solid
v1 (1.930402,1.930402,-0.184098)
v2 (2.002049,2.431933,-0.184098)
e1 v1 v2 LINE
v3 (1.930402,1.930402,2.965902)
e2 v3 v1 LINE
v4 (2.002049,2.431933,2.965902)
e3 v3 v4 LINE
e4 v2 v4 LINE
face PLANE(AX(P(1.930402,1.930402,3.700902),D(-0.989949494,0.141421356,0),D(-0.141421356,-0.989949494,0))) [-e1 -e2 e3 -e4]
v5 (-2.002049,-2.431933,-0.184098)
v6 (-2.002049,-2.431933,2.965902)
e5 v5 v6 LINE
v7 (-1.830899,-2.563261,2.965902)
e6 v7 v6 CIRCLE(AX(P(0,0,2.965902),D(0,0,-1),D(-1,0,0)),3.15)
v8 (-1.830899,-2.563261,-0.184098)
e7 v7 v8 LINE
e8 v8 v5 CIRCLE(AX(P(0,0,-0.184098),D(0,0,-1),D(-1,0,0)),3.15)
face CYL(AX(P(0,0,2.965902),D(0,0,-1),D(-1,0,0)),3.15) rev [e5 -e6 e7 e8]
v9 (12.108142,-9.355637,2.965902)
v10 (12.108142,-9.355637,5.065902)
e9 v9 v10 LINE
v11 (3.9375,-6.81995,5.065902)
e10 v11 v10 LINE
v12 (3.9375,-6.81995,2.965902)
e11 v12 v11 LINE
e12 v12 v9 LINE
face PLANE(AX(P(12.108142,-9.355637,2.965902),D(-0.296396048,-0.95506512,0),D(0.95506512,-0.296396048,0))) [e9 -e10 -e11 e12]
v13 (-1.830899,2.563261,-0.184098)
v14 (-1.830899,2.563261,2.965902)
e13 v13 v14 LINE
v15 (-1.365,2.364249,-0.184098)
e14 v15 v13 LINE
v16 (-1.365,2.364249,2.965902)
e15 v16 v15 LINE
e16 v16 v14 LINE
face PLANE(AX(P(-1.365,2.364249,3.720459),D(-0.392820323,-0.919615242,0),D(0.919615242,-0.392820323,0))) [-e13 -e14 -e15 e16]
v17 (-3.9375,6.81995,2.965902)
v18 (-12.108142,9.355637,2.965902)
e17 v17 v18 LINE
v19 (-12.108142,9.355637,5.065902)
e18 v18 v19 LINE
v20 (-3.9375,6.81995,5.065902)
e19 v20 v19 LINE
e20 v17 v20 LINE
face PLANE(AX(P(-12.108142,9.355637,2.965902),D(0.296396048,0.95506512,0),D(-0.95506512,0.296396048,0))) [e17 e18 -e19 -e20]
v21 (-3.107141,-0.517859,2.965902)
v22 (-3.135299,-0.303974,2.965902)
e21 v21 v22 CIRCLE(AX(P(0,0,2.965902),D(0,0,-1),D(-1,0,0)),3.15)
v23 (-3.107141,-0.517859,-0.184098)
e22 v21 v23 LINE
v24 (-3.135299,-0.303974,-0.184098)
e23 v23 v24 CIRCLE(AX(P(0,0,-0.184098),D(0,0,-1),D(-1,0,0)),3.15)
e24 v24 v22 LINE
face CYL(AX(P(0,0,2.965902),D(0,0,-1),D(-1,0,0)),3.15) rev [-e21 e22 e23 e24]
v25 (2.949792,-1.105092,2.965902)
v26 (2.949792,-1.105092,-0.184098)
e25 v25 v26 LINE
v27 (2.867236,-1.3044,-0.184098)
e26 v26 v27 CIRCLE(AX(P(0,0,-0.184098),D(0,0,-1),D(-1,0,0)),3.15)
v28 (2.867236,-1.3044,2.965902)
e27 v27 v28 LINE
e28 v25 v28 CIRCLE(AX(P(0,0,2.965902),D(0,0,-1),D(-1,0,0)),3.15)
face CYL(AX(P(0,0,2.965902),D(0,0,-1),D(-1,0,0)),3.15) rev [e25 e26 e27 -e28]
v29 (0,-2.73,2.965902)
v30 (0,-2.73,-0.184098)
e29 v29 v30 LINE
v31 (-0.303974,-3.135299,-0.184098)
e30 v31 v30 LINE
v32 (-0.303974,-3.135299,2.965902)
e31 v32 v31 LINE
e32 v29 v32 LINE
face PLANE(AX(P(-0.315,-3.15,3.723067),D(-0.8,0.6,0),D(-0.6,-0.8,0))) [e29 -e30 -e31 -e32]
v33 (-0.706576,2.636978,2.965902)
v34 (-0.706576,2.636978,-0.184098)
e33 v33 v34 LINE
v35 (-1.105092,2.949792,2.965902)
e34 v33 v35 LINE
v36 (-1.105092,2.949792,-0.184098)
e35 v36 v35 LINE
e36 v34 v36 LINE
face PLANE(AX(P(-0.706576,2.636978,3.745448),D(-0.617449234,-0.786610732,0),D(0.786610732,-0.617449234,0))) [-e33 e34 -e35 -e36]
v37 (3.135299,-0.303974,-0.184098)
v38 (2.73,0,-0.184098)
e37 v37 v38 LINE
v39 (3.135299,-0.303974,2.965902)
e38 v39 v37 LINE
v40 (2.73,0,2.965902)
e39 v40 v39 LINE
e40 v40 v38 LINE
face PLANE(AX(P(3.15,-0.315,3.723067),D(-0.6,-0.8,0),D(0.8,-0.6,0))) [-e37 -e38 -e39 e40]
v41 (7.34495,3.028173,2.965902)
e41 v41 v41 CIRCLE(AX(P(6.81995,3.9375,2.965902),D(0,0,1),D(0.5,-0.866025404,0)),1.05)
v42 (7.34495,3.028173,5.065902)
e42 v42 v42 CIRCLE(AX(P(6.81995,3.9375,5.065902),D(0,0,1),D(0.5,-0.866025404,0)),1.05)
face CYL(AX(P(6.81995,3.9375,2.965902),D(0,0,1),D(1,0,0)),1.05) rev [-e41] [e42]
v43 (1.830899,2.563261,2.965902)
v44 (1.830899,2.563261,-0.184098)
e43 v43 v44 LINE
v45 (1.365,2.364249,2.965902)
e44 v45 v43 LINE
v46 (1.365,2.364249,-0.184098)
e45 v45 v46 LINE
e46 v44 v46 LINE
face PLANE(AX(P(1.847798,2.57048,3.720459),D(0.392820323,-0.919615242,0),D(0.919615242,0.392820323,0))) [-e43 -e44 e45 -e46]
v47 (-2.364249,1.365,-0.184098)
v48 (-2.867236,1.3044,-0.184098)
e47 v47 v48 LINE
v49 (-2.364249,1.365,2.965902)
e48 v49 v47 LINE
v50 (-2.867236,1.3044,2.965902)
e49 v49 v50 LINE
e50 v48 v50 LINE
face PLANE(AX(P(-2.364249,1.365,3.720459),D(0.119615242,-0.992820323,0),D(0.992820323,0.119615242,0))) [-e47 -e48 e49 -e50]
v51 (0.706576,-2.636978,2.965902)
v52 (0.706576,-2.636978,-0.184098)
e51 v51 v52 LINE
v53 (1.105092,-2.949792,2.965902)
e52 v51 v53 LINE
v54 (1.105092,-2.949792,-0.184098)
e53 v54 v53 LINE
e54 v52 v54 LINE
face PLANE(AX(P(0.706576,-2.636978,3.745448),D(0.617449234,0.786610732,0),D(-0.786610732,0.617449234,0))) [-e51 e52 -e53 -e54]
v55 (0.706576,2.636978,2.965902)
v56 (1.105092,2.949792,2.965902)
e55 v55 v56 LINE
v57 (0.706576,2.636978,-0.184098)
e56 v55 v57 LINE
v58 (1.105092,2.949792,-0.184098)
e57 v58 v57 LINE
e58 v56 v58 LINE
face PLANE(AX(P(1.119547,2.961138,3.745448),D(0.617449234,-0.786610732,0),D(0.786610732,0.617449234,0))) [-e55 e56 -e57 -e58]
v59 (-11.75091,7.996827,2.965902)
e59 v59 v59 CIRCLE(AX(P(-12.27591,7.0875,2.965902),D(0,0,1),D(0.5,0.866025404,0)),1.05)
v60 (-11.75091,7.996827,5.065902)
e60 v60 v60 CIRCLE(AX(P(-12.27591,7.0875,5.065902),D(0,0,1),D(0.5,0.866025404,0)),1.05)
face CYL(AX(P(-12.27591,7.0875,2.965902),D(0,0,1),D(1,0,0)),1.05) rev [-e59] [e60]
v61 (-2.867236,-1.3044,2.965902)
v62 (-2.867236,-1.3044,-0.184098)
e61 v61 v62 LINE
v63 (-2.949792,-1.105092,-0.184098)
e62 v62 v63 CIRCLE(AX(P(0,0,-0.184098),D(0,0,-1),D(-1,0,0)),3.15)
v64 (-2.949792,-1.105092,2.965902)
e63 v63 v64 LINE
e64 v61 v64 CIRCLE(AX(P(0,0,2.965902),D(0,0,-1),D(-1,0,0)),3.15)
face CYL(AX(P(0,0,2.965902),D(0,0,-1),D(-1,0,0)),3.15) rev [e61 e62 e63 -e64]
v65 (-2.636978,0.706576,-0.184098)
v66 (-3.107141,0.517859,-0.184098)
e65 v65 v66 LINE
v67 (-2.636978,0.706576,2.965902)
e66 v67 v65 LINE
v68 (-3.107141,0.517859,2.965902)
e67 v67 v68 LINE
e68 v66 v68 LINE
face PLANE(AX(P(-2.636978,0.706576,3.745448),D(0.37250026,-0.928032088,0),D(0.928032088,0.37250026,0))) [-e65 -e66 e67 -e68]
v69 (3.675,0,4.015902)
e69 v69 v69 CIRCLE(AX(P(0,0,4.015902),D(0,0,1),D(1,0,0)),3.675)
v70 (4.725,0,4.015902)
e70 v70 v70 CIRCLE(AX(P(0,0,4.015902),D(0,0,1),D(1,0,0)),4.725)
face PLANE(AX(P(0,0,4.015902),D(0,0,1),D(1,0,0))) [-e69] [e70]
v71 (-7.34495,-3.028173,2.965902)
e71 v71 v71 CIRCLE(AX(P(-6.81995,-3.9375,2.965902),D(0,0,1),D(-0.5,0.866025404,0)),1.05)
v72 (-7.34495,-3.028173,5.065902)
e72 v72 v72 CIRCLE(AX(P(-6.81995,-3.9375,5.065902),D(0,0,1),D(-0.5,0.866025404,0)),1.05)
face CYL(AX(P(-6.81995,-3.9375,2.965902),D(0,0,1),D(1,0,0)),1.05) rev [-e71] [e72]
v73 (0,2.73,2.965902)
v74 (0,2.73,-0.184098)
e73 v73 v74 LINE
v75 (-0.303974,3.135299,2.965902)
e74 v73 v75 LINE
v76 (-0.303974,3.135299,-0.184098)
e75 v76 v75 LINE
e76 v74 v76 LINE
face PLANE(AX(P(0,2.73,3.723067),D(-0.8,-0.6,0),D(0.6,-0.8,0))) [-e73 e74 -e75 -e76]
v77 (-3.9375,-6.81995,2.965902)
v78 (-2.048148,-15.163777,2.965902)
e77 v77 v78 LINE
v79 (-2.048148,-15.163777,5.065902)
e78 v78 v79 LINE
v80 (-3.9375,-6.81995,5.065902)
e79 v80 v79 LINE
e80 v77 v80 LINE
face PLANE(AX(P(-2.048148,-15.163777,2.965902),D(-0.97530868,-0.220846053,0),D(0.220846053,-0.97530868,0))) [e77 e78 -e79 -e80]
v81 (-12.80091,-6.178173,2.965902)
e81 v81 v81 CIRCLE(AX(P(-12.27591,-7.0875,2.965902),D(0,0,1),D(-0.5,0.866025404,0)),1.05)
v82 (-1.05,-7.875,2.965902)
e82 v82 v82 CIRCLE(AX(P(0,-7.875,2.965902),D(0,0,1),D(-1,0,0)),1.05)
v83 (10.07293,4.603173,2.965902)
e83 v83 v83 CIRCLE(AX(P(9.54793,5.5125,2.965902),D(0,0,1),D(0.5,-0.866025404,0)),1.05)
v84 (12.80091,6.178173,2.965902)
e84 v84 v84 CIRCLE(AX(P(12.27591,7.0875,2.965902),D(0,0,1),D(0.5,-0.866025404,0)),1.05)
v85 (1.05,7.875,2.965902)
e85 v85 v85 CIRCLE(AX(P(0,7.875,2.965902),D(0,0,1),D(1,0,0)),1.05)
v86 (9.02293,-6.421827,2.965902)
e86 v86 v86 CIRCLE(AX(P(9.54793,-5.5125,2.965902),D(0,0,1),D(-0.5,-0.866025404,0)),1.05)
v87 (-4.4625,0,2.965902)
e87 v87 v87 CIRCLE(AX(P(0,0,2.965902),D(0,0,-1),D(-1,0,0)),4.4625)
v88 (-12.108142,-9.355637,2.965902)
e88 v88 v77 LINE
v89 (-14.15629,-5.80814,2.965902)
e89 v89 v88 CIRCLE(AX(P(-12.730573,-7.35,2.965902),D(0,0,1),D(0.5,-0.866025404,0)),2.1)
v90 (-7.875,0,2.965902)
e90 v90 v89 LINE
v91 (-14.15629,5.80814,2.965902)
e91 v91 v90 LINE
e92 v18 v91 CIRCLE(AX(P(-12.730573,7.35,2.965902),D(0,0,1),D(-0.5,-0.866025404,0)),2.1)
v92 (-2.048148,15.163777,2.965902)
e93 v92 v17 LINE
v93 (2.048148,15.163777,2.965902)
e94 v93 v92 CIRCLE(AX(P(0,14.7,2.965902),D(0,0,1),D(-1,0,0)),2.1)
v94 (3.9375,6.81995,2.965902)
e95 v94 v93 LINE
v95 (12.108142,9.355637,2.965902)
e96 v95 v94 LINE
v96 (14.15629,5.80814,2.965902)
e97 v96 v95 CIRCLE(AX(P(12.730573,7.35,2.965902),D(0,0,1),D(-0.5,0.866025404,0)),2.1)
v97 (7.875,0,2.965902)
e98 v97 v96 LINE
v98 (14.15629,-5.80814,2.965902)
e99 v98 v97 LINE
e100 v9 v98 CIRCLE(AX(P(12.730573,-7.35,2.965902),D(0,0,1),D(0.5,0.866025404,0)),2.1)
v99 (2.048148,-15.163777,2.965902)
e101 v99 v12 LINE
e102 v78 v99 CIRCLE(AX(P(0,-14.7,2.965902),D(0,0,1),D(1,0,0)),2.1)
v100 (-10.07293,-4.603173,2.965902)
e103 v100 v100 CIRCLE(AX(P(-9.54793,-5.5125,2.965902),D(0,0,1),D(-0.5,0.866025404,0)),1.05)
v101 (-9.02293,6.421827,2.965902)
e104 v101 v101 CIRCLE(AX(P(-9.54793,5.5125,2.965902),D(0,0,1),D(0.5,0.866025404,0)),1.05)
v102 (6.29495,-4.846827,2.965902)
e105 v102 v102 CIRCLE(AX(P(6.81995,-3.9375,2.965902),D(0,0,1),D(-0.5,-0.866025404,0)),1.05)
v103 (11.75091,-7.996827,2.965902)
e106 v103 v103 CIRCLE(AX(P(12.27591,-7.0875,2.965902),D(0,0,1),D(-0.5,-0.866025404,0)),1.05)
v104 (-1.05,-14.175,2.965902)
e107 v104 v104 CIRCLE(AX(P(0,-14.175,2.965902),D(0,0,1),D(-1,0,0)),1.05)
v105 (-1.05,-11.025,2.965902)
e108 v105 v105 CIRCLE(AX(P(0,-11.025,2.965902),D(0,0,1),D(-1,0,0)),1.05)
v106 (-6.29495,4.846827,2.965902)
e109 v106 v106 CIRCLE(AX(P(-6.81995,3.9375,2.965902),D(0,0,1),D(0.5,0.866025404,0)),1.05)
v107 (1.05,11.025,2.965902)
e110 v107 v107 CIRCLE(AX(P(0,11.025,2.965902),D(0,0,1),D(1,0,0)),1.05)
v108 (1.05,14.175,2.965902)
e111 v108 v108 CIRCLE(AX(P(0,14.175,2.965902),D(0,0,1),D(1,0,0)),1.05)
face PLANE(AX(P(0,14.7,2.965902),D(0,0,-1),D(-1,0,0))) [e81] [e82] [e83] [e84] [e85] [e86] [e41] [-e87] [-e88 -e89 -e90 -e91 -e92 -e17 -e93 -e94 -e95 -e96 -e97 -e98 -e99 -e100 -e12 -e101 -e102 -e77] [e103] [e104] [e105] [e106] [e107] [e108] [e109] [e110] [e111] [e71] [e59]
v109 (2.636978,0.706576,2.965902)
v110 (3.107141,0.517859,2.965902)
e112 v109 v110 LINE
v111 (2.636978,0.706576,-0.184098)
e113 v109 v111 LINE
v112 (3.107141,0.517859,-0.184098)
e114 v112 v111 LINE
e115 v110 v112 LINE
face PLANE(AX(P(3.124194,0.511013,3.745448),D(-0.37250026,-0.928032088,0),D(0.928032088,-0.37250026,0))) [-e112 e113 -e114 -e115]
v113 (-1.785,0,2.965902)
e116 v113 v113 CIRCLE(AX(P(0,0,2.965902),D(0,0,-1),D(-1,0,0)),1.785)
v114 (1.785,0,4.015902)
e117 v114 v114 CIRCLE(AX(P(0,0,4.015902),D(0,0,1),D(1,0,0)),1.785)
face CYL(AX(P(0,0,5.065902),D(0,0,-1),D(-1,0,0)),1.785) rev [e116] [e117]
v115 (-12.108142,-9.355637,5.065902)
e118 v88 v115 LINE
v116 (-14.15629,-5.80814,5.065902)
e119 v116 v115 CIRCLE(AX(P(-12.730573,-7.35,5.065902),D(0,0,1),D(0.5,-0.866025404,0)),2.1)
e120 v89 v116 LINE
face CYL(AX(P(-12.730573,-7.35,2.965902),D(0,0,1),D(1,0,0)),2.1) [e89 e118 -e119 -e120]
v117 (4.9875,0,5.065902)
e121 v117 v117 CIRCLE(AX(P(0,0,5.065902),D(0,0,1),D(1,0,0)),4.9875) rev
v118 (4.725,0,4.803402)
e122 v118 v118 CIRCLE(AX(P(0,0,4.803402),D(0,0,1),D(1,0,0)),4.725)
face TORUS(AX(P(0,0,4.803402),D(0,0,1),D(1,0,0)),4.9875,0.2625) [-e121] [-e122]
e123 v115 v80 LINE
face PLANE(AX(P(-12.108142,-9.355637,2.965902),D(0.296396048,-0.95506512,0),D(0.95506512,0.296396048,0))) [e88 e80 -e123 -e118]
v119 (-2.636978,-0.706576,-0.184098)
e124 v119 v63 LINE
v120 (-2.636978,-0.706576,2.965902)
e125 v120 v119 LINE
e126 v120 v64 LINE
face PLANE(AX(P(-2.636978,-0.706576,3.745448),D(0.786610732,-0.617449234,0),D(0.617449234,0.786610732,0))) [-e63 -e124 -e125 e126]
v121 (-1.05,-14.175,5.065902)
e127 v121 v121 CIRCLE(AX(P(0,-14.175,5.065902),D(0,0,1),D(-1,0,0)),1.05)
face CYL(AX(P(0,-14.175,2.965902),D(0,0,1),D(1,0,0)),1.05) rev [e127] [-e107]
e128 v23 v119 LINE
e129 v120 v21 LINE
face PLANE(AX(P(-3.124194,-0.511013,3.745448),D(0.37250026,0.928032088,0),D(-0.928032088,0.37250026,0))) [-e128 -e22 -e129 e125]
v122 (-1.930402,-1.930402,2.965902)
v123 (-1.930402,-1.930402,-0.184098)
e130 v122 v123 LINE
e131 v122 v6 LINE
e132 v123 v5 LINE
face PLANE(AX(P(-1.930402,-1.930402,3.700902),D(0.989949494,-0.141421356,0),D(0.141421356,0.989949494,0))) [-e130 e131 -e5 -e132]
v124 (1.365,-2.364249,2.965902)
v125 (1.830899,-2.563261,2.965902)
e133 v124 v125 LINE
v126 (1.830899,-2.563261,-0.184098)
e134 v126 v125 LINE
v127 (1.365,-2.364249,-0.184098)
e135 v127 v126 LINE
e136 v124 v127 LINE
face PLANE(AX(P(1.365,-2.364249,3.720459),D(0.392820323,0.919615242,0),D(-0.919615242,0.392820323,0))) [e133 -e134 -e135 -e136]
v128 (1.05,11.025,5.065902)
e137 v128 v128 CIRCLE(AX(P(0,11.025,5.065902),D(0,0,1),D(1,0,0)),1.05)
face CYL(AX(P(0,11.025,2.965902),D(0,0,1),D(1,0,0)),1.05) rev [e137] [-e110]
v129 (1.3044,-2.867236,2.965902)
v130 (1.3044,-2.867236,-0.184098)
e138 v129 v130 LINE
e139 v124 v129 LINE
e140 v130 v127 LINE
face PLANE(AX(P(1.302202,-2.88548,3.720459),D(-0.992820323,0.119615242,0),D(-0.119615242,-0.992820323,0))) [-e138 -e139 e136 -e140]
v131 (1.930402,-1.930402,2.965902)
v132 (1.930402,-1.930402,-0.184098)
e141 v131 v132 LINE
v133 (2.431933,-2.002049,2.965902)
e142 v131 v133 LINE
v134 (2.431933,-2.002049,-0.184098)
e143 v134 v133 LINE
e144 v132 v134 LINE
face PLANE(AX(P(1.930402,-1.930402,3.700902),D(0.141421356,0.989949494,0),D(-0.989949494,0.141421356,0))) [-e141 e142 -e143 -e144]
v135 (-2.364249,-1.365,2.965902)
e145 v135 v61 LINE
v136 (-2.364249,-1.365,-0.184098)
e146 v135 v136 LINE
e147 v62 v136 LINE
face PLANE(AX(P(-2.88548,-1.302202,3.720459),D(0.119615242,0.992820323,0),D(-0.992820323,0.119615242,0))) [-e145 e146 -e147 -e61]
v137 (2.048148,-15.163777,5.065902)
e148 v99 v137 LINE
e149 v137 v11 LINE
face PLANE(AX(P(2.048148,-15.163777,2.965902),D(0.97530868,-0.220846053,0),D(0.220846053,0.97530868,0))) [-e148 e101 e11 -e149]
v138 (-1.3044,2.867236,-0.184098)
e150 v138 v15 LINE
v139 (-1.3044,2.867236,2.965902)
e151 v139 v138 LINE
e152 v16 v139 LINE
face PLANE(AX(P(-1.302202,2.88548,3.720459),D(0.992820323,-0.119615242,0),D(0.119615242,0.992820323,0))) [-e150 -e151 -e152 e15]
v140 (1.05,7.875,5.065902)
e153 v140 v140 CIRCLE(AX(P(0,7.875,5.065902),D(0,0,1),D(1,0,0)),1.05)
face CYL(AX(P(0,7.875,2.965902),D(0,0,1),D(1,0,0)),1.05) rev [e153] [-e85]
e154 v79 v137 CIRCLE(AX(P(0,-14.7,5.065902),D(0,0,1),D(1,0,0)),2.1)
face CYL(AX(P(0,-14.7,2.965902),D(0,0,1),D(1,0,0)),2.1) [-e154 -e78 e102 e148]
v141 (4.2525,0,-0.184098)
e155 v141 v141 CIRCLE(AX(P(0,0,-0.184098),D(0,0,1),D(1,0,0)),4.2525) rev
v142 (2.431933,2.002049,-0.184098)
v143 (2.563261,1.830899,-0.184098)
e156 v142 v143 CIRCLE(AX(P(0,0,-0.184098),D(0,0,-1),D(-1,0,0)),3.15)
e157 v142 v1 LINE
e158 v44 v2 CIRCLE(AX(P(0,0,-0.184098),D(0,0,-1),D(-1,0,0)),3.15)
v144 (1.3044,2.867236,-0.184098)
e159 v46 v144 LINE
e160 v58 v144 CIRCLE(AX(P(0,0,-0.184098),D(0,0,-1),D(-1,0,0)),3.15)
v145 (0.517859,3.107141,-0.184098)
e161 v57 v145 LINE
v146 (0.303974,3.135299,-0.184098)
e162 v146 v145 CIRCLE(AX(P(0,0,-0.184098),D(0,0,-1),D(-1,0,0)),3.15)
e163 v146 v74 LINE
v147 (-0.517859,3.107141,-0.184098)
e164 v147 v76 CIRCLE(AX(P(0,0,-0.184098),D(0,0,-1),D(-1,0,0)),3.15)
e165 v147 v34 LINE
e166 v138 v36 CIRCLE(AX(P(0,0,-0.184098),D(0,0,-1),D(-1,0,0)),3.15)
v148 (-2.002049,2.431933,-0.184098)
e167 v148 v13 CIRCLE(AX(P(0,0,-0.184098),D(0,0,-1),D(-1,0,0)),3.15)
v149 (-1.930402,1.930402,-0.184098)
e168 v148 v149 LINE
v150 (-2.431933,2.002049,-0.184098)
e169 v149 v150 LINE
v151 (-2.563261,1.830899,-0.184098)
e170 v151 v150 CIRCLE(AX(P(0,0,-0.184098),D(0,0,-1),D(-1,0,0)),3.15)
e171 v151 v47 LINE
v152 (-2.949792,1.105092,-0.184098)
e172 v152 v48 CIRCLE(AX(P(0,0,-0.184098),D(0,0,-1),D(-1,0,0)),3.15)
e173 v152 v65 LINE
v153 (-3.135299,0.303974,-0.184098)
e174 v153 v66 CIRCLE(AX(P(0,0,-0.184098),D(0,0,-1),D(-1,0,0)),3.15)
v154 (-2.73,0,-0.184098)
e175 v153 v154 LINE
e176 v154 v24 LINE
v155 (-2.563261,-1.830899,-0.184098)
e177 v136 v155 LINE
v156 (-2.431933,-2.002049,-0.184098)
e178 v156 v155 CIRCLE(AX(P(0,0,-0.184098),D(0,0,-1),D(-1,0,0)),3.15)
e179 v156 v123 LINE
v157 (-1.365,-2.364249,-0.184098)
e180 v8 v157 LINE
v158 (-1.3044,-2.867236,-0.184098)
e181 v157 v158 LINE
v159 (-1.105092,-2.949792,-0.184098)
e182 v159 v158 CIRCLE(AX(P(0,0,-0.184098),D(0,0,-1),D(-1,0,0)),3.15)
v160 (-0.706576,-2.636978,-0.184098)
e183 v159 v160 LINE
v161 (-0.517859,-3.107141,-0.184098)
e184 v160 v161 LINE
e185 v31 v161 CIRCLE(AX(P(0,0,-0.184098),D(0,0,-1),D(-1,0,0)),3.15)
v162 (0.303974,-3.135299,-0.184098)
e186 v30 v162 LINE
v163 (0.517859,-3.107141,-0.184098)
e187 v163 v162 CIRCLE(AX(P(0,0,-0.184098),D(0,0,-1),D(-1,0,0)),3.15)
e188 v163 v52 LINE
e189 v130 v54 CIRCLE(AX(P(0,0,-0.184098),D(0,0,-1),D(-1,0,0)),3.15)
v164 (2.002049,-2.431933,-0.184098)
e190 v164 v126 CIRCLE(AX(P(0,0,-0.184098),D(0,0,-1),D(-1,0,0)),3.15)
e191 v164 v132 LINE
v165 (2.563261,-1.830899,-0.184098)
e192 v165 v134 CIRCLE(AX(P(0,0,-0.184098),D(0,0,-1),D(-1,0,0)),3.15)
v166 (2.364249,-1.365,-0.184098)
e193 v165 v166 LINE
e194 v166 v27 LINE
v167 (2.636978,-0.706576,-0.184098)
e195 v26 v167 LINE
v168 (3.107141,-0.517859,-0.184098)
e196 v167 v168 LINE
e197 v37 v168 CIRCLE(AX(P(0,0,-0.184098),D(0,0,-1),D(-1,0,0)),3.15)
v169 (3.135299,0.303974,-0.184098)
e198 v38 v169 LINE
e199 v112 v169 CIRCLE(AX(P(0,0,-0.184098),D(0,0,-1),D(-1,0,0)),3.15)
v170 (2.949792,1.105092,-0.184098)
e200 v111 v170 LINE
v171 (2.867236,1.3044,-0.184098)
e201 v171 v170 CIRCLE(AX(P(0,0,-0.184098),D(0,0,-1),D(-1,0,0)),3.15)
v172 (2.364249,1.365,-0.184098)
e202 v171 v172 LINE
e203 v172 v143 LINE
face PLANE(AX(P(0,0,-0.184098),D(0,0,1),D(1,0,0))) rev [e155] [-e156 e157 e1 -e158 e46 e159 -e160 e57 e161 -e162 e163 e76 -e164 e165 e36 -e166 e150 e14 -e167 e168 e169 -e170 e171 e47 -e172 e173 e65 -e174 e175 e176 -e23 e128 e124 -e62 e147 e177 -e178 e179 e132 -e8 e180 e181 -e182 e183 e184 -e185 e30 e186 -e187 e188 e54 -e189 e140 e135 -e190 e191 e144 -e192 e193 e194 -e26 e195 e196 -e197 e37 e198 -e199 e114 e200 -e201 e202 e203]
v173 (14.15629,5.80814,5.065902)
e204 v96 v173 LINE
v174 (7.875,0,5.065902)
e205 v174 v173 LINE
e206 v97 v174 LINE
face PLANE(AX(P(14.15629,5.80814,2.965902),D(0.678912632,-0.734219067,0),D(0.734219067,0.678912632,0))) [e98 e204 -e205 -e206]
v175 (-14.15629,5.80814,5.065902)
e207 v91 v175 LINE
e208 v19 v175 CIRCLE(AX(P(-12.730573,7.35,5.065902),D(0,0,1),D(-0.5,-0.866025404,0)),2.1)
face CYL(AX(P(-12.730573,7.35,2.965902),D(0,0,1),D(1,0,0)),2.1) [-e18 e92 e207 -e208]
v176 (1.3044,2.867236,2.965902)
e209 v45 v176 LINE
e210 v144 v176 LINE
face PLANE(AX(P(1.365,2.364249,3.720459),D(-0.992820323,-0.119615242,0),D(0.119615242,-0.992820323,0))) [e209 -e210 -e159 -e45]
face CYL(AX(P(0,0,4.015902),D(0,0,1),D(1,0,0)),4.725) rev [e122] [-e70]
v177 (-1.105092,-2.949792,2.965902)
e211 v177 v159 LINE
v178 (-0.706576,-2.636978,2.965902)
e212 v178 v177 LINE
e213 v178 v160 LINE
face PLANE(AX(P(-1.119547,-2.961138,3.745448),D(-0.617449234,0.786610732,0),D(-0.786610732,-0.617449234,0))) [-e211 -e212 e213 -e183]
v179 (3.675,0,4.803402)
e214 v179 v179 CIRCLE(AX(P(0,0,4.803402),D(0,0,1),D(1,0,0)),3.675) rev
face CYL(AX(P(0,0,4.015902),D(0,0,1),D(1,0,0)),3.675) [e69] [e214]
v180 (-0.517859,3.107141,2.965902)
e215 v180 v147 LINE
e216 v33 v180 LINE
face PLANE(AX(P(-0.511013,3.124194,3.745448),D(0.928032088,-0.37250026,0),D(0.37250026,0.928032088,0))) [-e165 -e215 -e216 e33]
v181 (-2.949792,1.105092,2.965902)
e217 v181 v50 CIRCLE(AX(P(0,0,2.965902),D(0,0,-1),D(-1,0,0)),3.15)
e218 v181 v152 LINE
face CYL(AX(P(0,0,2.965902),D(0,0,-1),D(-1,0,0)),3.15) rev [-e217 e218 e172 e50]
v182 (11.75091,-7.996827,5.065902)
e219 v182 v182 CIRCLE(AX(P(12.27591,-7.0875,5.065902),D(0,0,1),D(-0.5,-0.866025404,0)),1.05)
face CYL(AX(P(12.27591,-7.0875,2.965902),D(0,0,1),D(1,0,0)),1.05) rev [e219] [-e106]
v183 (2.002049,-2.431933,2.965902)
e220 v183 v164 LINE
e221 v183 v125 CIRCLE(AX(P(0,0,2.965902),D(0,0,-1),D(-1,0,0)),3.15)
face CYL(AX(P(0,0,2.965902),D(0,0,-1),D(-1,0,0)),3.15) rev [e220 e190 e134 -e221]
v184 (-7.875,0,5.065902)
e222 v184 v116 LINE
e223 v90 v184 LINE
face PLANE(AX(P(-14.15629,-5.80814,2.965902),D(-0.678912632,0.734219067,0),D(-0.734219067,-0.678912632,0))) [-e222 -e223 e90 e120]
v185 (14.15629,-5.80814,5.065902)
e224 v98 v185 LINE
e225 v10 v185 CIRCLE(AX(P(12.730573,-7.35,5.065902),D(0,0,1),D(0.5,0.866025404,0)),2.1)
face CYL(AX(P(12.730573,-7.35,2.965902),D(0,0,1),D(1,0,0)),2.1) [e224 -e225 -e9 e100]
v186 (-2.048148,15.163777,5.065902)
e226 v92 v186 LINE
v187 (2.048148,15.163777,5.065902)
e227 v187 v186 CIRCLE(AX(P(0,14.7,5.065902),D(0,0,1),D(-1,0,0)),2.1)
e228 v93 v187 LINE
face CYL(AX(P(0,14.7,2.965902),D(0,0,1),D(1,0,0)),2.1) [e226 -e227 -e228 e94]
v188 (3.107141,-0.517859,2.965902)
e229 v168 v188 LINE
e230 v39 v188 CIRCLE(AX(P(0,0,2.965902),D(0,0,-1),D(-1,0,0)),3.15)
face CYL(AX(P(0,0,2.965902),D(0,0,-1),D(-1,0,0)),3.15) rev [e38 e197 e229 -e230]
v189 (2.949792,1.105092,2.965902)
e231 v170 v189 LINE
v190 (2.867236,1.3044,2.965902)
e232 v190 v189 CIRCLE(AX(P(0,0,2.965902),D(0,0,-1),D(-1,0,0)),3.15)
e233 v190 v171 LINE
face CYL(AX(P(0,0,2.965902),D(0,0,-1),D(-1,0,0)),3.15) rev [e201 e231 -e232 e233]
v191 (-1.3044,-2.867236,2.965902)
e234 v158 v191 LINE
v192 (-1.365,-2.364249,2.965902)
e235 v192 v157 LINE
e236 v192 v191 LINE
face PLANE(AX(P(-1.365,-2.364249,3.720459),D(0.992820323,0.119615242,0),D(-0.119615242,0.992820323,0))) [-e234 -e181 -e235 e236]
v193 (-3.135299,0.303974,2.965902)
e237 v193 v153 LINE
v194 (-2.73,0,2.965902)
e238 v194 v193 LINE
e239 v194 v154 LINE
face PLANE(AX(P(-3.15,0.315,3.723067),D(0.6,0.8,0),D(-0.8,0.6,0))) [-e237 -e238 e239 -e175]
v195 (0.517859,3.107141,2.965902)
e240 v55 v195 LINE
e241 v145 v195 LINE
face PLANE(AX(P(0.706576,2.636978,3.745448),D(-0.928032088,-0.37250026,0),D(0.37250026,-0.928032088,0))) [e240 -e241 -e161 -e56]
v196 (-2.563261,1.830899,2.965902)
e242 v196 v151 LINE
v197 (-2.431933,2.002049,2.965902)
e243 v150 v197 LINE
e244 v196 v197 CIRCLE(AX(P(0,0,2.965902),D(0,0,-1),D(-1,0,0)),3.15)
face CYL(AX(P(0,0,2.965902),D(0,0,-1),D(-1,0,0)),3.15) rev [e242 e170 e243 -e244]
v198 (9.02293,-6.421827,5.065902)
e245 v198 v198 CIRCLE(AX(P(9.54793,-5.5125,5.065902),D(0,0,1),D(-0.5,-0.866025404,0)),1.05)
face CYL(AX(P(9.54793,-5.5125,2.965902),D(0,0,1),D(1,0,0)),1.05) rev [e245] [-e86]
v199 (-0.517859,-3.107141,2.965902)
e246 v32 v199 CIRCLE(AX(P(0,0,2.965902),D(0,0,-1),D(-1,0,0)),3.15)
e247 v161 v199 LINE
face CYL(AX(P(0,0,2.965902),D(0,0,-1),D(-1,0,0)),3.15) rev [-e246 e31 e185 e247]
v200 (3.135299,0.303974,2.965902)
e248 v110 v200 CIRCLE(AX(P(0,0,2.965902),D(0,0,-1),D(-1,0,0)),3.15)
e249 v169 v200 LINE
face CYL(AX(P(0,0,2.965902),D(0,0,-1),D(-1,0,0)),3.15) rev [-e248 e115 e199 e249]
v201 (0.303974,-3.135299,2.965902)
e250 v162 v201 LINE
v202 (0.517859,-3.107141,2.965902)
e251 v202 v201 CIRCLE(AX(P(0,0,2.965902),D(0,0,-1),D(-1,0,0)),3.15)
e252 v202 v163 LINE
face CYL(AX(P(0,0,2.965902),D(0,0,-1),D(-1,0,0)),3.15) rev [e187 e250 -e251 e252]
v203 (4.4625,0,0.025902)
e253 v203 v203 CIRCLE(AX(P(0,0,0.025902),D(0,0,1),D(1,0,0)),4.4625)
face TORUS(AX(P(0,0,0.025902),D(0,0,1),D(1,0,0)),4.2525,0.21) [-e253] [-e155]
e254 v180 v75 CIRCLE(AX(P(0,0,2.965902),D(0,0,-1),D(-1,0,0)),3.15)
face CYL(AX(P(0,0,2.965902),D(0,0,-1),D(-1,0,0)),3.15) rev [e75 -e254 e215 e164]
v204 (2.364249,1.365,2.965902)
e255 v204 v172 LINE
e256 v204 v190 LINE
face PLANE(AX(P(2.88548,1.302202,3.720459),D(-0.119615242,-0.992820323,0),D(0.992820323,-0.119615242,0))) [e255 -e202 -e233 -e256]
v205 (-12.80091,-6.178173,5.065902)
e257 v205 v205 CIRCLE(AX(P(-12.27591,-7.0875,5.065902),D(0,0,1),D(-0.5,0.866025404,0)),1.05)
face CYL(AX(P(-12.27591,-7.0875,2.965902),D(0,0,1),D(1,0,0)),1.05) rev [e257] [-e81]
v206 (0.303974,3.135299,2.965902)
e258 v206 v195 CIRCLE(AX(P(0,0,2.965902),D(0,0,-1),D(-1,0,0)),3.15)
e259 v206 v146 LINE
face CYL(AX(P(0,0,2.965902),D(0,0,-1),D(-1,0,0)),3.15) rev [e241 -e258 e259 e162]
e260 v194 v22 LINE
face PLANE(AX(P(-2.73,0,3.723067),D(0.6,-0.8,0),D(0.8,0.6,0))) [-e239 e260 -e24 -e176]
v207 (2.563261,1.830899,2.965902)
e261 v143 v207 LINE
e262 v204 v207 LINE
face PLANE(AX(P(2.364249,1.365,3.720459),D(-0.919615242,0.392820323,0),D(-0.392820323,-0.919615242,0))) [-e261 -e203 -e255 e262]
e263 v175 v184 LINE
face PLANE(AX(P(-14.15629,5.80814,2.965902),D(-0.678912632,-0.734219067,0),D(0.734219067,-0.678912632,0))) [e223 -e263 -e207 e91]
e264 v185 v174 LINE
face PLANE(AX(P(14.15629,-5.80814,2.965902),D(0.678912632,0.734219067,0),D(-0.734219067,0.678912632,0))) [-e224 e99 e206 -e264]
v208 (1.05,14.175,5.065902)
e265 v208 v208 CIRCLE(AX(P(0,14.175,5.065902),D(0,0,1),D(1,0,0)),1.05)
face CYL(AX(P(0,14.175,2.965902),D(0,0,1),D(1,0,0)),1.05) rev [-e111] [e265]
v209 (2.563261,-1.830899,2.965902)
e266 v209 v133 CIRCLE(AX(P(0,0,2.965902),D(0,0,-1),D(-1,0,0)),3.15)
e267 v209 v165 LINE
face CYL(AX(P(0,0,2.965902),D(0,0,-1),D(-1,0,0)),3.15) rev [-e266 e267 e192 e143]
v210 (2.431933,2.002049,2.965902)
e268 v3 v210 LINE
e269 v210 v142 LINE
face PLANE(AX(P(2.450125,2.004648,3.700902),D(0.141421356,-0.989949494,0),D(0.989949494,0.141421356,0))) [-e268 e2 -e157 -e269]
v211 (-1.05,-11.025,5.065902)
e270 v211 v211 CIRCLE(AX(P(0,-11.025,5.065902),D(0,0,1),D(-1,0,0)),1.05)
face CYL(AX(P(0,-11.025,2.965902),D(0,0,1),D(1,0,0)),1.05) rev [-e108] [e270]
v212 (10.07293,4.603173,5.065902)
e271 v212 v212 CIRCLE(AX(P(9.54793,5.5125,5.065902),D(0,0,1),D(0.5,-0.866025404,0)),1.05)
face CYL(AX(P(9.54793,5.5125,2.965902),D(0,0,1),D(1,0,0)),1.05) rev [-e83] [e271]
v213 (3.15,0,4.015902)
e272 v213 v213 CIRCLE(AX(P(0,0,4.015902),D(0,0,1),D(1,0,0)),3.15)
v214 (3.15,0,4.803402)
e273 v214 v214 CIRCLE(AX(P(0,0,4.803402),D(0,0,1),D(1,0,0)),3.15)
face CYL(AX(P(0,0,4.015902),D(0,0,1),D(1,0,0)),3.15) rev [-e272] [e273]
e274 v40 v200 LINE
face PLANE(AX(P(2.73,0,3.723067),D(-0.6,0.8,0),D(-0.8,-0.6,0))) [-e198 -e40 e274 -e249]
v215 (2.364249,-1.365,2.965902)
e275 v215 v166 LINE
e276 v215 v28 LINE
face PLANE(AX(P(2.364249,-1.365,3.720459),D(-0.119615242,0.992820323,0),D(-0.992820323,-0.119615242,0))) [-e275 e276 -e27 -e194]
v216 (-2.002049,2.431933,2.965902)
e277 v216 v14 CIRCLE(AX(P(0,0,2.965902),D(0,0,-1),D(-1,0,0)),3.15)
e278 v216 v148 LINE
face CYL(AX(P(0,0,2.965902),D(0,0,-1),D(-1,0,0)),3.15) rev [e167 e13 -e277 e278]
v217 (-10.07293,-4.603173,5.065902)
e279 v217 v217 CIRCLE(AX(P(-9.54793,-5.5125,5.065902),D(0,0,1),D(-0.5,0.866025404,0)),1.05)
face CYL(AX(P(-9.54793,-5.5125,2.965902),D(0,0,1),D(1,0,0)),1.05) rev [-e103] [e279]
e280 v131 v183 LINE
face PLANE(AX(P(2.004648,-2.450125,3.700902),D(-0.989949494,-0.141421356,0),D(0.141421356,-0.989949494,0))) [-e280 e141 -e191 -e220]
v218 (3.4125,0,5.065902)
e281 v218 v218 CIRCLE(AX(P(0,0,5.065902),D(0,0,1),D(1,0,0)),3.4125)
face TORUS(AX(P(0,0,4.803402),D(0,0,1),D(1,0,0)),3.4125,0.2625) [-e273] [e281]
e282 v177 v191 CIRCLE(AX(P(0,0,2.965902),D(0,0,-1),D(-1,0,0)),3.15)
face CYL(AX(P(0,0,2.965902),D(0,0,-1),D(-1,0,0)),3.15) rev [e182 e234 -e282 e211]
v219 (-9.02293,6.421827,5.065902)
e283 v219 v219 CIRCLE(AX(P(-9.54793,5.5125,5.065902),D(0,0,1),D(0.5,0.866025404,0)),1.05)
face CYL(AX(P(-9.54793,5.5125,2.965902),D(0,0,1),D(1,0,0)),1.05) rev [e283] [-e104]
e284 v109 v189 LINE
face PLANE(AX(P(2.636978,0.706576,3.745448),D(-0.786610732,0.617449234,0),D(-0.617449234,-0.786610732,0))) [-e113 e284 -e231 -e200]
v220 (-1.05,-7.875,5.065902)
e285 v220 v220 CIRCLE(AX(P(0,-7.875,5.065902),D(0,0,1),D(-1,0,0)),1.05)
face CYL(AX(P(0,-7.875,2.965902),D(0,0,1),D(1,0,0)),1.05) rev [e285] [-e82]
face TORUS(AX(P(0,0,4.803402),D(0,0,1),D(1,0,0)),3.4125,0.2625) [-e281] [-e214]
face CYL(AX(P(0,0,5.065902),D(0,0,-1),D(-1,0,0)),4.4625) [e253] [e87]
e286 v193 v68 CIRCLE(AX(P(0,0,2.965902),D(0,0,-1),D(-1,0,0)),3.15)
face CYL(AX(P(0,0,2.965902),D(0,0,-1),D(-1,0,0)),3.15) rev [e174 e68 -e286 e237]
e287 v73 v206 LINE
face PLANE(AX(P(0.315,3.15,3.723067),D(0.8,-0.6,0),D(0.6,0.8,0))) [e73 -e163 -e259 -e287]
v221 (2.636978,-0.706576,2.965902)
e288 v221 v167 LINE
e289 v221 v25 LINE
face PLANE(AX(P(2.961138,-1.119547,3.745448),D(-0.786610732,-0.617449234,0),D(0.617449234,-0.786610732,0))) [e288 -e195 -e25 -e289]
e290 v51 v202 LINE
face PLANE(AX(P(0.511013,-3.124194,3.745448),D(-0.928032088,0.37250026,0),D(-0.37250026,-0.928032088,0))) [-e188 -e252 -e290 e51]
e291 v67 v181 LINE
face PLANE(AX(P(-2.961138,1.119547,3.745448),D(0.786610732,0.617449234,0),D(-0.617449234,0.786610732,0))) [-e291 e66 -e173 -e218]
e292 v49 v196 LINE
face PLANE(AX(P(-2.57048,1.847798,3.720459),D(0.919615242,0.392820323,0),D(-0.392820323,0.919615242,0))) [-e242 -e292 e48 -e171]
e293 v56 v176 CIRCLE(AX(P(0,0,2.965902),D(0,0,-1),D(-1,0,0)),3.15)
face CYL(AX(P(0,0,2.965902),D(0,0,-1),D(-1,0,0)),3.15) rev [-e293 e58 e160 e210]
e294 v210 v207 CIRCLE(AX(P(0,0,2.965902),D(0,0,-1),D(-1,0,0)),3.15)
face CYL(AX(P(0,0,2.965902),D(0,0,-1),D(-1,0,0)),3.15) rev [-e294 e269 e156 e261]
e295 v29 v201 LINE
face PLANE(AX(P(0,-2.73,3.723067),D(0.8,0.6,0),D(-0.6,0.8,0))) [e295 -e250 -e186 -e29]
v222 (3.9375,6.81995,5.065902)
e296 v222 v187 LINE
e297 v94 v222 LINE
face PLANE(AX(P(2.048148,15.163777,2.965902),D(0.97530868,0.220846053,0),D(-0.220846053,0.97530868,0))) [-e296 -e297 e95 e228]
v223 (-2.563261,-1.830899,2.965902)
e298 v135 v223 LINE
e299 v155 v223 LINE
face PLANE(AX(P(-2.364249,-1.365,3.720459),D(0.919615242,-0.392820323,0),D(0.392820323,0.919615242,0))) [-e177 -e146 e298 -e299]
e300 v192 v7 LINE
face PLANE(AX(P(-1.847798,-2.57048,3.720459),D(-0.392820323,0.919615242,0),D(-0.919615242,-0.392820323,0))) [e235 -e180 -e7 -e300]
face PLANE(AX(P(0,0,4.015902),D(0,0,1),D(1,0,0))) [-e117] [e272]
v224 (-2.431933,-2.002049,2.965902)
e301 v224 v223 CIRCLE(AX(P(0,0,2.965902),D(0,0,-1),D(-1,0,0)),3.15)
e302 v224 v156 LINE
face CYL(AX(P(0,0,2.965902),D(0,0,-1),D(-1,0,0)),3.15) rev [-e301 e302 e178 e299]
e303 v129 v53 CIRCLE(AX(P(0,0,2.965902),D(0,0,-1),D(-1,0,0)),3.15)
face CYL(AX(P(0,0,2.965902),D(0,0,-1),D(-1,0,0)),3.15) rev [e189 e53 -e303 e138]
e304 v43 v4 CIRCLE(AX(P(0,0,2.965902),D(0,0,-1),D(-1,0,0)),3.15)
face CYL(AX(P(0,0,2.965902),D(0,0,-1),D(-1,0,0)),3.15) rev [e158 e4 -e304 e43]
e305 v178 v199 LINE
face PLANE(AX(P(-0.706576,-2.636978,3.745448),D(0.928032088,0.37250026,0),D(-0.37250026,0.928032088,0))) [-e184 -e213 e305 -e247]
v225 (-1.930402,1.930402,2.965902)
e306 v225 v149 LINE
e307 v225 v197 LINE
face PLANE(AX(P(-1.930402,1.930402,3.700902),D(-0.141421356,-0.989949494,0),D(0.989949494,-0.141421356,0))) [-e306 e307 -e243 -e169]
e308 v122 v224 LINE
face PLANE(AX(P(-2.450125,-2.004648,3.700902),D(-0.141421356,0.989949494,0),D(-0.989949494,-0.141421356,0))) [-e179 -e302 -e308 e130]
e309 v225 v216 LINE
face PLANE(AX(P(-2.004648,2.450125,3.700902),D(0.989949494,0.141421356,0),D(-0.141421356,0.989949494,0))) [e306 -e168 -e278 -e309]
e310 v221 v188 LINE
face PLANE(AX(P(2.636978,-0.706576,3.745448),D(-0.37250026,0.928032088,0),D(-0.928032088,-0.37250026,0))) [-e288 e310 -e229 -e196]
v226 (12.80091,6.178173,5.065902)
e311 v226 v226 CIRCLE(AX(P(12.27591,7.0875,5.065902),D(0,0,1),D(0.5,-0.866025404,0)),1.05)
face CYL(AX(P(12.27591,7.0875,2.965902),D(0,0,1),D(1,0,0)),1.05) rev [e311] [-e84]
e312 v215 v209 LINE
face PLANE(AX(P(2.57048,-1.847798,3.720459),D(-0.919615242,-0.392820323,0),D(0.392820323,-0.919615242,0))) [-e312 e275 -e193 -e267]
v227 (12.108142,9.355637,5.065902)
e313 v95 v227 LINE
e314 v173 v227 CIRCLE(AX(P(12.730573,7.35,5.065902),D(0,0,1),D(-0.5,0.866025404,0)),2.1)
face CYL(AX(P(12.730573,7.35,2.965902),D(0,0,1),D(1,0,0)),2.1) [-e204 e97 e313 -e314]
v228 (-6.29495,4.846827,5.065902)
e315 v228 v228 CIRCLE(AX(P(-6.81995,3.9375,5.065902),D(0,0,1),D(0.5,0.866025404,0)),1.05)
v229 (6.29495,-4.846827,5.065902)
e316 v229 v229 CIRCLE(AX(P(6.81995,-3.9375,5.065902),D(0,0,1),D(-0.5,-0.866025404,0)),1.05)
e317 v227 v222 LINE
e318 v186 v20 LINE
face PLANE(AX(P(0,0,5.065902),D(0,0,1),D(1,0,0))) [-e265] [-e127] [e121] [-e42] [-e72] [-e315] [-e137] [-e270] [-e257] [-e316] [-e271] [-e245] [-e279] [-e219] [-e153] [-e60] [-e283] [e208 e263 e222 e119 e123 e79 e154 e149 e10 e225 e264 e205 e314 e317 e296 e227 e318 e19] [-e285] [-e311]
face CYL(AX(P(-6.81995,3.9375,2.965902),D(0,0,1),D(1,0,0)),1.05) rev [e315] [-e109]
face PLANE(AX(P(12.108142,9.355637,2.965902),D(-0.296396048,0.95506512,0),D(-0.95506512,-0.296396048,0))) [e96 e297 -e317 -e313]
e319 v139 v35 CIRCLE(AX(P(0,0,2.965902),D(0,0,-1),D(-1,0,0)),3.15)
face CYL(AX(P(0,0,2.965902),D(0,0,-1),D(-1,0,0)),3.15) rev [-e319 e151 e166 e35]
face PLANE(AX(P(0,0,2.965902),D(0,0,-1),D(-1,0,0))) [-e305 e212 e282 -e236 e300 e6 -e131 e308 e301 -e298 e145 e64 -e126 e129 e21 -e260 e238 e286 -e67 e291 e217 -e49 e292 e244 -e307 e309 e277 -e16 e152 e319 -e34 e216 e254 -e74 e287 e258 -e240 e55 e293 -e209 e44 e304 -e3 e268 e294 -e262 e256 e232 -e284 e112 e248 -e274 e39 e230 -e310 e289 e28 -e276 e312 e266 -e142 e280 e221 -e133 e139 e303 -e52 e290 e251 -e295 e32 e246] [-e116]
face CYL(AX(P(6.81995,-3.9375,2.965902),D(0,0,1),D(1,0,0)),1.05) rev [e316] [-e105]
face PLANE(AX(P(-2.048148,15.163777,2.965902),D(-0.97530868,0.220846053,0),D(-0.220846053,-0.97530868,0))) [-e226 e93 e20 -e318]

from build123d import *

# Parameters (mm, degrees)
ESQUISSE1_R                  = 4.25
ESQUISSE1_R_2                = 1.7
BOSS_EXTRU_1_DEPTH           = 5
ESQUISSE2_R                  = 3
ENL_V_MAT_EXTRU_1_DEPTH      = 3
BOSS_EXTRU_2_DEPTH           = 3
R_P_TITION_CIRCULAIRE1_DEPTH = 4
ESQUISSE4_R                  = 1
BOSS_EXTRU_3_DEPTH           = 2
R_P_TITION_CIRCULAIRE2_COUNT = 6
ENL_V_START                  = -1
ESQUISSE5_R                  = 3
ENL_V_MAT_EXTRU_2_DEPTH      = 1
CONG_1_R                     = 0.2
ESQUISSE6_R                  = 4.5
ESQUISSE6_R_2                = 3.5
ENL_V_MAT_EXTRU_3_DEPTH      = 1
CONG_2_R                     = 0.25
SCALE1_SCALE                 = 1.05


with BuildPart() as part:
    # Esquisse1 → Boss.-Extru.1 (new body)
    with BuildSketch(Plane.XY):
        Circle(ESQUISSE1_R)
        Circle(ESQUISSE1_R_2, mode=Mode.SUBTRACT)
    extrude(amount=BOSS_EXTRU_1_DEPTH)

    # Esquisse2 → Enlèv. mat.-Extru.1 (cut)
    with BuildSketch(Plane(origin=(0, 0, 0), x_dir=(-1, 0, 0), z_dir=(0, 0, -1))):
        Circle(ESQUISSE2_R)
    extrude(amount=-ENL_V_MAT_EXTRU_1_DEPTH, mode=Mode.SUBTRACT)

    # Esquisse3 → Boss.-Extru.2 (add)
    with BuildSketch(Plane(origin=(0, 0, 0), x_dir=(-1, 0, 0), z_dir=(0, 0, -1))):
        Polygon((-0.3, 3), (0, 2.6), (0.3, 3), align=None)
    extrude(amount=-BOSS_EXTRU_2_DEPTH)

    # Répétition circulaire1: read off the stored shape, not the designer's step
    # Répétition circulaire1 outline → Répétition circulaire1 (add)
    with BuildSketch(Plane.XY):
        with BuildLine():
            ThreePointArc((1.052468236, 2.80932565), (0.776457135, 2.897777479), (0.493198596, 2.959181499))
            Line((0.493198596, 2.959181499), (0.672929517, 2.511407148))
            Line((0.672929517, 2.511407148), (1.052468236, 2.80932565))
        make_face()
        with BuildLine():
            ThreePointArc((-0.493198596, 2.959181499), (-0.776457135, 2.897777479), (-1.052468236, 2.80932565))
            Line((-1.052468236, 2.80932565), (-0.672929517, 2.511407148))
            Line((-0.672929517, 2.511407148), (-0.493198596, 2.959181499))
        make_face()
        with BuildLine():
            ThreePointArc((-1.242285791, 2.730700645), (-1.5, 2.598076211), (-1.743713233, 2.441201376))
            Line((-1.743713233, 2.441201376), (-1.3, 2.25166605))
            Line((-1.3, 2.25166605), (-1.242285791, 2.730700645))
        make_face()
        with BuildLine():
            ThreePointArc((-1.906713263, 2.316127054), (-2.121320343, 2.121320343), (-2.316127054, 1.906713263))
            Line((-2.316127054, 1.906713263), (-1.838477631, 1.838477631))
            Line((-1.838477631, 1.838477631), (-1.906713263, 2.316127054))
        make_face()
        with BuildLine():
            ThreePointArc((-2.441201376, 1.743713233), (-2.598076211, 1.5), (-2.730700645, 1.242285791))
            Line((-2.730700645, 1.242285791), (-2.25166605, 1.3))
            Line((-2.25166605, 1.3), (-2.441201376, 1.743713233))
        make_face()
        with BuildLine():
            ThreePointArc((-2.809325651, 1.052468236), (-2.897777479, 0.776457135), (-2.959181499, 0.493198596))
            Line((-2.959181499, 0.493198596), (-2.511407148, 0.672929517))
            Line((-2.511407148, 0.672929517), (-2.809325651, 1.052468236))
        make_face()
        with BuildLine():
            ThreePointArc((-2.985999024, 0.289499268), (-3, 0), (-2.985999024, -0.289499268))
            Line((-2.985999024, -0.289499268), (-2.6, 0))
            Line((-2.6, 0), (-2.985999024, 0.289499268))
        make_face()
        with BuildLine():
            ThreePointArc((-2.959181499, -0.493198596), (-2.897777479, -0.776457135), (-2.809325651, -1.052468236))
            Line((-2.809325651, -1.052468236), (-2.511407148, -0.672929517))
            Line((-2.511407148, -0.672929517), (-2.959181499, -0.493198596))
        make_face()
        with BuildLine():
            ThreePointArc((-2.730700645, -1.242285791), (-2.598076211, -1.5), (-2.441201377, -1.743713233))
            Line((-2.441201377, -1.743713233), (-2.25166605, -1.3))
            Line((-2.25166605, -1.3), (-2.730700645, -1.242285791))
        make_face()
        with BuildLine():
            ThreePointArc((-2.316127055, -1.906713263), (-2.121320344, -2.121320344), (-1.906713263, -2.316127055))
            Line((-1.906713263, -2.316127055), (-1.838477631, -1.838477631))
            Line((-1.838477631, -1.838477631), (-2.316127055, -1.906713263))
        make_face()
        with BuildLine():
            ThreePointArc((-1.743713233, -2.441201377), (-1.5, -2.598076211), (-1.242285791, -2.730700645))
            Line((-1.242285791, -2.730700645), (-1.3, -2.25166605))
            Line((-1.3, -2.25166605), (-1.743713233, -2.441201377))
        make_face()
        with BuildLine():
            ThreePointArc((-1.052468236, -2.809325651), (-0.776457135, -2.897777479), (-0.493198596, -2.959181499))
            Line((-0.493198596, -2.959181499), (-0.672929517, -2.511407148))
            Line((-0.672929517, -2.511407148), (-1.052468236, -2.809325651))
        make_face()
        with BuildLine():
            ThreePointArc((-0.289499268, -2.985999024), (0, -3), (0.289499268, -2.985999024))
            Line((0.289499268, -2.985999024), (0, -2.6))
            Line((0, -2.6), (-0.289499268, -2.985999024))
        make_face()
        with BuildLine():
            ThreePointArc((0.493198596, -2.959181499), (0.776457135, -2.897777479), (1.052468236, -2.809325651))
            Line((1.052468236, -2.809325651), (0.672929517, -2.511407148))
            Line((0.672929517, -2.511407148), (0.493198596, -2.959181499))
        make_face()
        with BuildLine():
            ThreePointArc((1.242285791, -2.730700645), (1.5, -2.598076211), (1.743713233, -2.441201377))
            Line((1.743713233, -2.441201377), (1.3, -2.25166605))
            Line((1.3, -2.25166605), (1.242285791, -2.730700645))
        make_face()
        with BuildLine():
            ThreePointArc((1.906713263, -2.316127055), (2.121320344, -2.121320344), (2.316127055, -1.906713263))
            Line((2.316127055, -1.906713263), (1.838477631, -1.838477631))
            Line((1.838477631, -1.838477631), (1.906713263, -2.316127055))
        make_face()
        with BuildLine():
            ThreePointArc((2.441201377, -1.743713233), (2.598076211, -1.5), (2.730700645, -1.242285791))
            Line((2.730700645, -1.242285791), (2.25166605, -1.3))
            Line((2.25166605, -1.3), (2.441201377, -1.743713233))
        make_face()
        with BuildLine():
            ThreePointArc((2.809325651, -1.052468236), (2.897777479, -0.776457135), (2.959181499, -0.493198596))
            Line((2.959181499, -0.493198596), (2.511407148, -0.672929517))
            Line((2.511407148, -0.672929517), (2.809325651, -1.052468236))
        make_face()
        with BuildLine():
            ThreePointArc((2.985999024, -0.289499268), (3, 0), (2.985999024, 0.289499268))
            Line((2.985999024, 0.289499268), (2.6, 0))
            Line((2.6, 0), (2.985999024, -0.289499268))
        make_face()
        with BuildLine():
            ThreePointArc((2.959181499, 0.493198596), (2.897777479, 0.776457135), (2.809325651, 1.052468236))
            Line((2.809325651, 1.052468236), (2.511407148, 0.672929517))
            Line((2.511407148, 0.672929517), (2.959181499, 0.493198596))
        make_face()
        with BuildLine():
            ThreePointArc((2.730700645, 1.242285791), (2.598076211, 1.5), (2.441201376, 1.743713233))
            Line((2.441201376, 1.743713233), (2.25166605, 1.3))
            Line((2.25166605, 1.3), (2.730700645, 1.242285791))
        make_face()
        with BuildLine():
            ThreePointArc((2.316127054, 1.906713263), (2.121320343, 2.121320343), (1.906713263, 2.316127054))
            Line((1.906713263, 2.316127054), (1.838477631, 1.838477631))
            Line((1.838477631, 1.838477631), (2.316127054, 1.906713263))
        make_face()
        with BuildLine():
            ThreePointArc((1.743713233, 2.441201376), (1.5, 2.598076211), (1.242285791, 2.730700645))
            Line((1.242285791, 2.730700645), (1.3, 2.25166605))
            Line((1.3, 2.25166605), (1.743713233, 2.441201376))
        make_face()
    extrude(amount=R_P_TITION_CIRCULAIRE1_DEPTH)

    # Esquisse4 → Boss.-Extru.3 (add)
    with BuildSketch(Plane.XY.offset(5)):
        with BuildLine():
            Line((-1.95061736, 14.441692106), (-3.75, 6.495190528))
            Line((-3.75, 6.495190528), (-3.75, 2))
            Line((-3.75, 2), (0, 3.364888378))
            Line((0, 3.364888378), (3.75, 2))
            Line((3.75, 2), (3.75, 6.495190528))
            Line((3.75, 6.495190528), (1.95061736, 14.441692106))
            ThreePointArc((1.95061736, 14.441692106), (0, 16), (-1.95061736, 14.441692106))
        make_face()
        with Locations((0, 7.5)):
            Circle(ESQUISSE4_R, mode=Mode.SUBTRACT)
        with Locations((0, 10.5)):
            Circle(ESQUISSE4_R, mode=Mode.SUBTRACT)
        with Locations((0, 13.5)):
            Circle(ESQUISSE4_R, mode=Mode.SUBTRACT)
    boss_extru_3 = extrude(amount=-BOSS_EXTRU_3_DEPTH)

    # Répétition circulaire2: Boss.-Extru.3 ×6 about axis
    r_p_tition_circulaire2_axis = Axis((0, 0, 0), (0, 0, 1))
    for i in range(1, R_P_TITION_CIRCULAIRE2_COUNT):
        add(boss_extru_3.rotate(r_p_tition_circulaire2_axis, i * 360 / R_P_TITION_CIRCULAIRE2_COUNT))

    # Esquisse5 → Enlèv. mat.-Extru.2 (cut)
    with BuildSketch(Plane.XY.offset(5).offset(ENL_V_START)):
        Circle(ESQUISSE5_R)
    extrude(amount=ENL_V_MAT_EXTRU_2_DEPTH, mode=Mode.SUBTRACT)

    # Congé1
    cong_1_edges = [part.edges().sort_by_distance(p)[0] for p in [
        (-4.25, 0, 0),
    ]]
    fillet(cong_1_edges, radius=CONG_1_R)

    # Esquisse6 → Enlèv. mat.-Extru.3 (cut)
    with BuildSketch(Plane.XY.offset(5)):
        Circle(ESQUISSE6_R)
        Circle(ESQUISSE6_R_2, mode=Mode.SUBTRACT)
    extrude(amount=-ENL_V_MAT_EXTRU_3_DEPTH, mode=Mode.SUBTRACT)

    # Congé2
    cong_2_edges = [part.edges().sort_by_distance(p)[0] for p in [
        (-3, 0, 5),
        (-4.5, 0, 5),
        (-3.5, 0, 5),
    ]]
    fillet(cong_2_edges, radius=CONG_2_R - 0.0001)  # a hair under: the kernel refuses the full size


with BuildPart() as part_1:
    # Scale1: scaled about (0, 0, 3.681971043)
    add(part.part.scale(SCALE1_SCALE).moved(Location((0, 0, -0.184098552))))


solid = part_1.part
